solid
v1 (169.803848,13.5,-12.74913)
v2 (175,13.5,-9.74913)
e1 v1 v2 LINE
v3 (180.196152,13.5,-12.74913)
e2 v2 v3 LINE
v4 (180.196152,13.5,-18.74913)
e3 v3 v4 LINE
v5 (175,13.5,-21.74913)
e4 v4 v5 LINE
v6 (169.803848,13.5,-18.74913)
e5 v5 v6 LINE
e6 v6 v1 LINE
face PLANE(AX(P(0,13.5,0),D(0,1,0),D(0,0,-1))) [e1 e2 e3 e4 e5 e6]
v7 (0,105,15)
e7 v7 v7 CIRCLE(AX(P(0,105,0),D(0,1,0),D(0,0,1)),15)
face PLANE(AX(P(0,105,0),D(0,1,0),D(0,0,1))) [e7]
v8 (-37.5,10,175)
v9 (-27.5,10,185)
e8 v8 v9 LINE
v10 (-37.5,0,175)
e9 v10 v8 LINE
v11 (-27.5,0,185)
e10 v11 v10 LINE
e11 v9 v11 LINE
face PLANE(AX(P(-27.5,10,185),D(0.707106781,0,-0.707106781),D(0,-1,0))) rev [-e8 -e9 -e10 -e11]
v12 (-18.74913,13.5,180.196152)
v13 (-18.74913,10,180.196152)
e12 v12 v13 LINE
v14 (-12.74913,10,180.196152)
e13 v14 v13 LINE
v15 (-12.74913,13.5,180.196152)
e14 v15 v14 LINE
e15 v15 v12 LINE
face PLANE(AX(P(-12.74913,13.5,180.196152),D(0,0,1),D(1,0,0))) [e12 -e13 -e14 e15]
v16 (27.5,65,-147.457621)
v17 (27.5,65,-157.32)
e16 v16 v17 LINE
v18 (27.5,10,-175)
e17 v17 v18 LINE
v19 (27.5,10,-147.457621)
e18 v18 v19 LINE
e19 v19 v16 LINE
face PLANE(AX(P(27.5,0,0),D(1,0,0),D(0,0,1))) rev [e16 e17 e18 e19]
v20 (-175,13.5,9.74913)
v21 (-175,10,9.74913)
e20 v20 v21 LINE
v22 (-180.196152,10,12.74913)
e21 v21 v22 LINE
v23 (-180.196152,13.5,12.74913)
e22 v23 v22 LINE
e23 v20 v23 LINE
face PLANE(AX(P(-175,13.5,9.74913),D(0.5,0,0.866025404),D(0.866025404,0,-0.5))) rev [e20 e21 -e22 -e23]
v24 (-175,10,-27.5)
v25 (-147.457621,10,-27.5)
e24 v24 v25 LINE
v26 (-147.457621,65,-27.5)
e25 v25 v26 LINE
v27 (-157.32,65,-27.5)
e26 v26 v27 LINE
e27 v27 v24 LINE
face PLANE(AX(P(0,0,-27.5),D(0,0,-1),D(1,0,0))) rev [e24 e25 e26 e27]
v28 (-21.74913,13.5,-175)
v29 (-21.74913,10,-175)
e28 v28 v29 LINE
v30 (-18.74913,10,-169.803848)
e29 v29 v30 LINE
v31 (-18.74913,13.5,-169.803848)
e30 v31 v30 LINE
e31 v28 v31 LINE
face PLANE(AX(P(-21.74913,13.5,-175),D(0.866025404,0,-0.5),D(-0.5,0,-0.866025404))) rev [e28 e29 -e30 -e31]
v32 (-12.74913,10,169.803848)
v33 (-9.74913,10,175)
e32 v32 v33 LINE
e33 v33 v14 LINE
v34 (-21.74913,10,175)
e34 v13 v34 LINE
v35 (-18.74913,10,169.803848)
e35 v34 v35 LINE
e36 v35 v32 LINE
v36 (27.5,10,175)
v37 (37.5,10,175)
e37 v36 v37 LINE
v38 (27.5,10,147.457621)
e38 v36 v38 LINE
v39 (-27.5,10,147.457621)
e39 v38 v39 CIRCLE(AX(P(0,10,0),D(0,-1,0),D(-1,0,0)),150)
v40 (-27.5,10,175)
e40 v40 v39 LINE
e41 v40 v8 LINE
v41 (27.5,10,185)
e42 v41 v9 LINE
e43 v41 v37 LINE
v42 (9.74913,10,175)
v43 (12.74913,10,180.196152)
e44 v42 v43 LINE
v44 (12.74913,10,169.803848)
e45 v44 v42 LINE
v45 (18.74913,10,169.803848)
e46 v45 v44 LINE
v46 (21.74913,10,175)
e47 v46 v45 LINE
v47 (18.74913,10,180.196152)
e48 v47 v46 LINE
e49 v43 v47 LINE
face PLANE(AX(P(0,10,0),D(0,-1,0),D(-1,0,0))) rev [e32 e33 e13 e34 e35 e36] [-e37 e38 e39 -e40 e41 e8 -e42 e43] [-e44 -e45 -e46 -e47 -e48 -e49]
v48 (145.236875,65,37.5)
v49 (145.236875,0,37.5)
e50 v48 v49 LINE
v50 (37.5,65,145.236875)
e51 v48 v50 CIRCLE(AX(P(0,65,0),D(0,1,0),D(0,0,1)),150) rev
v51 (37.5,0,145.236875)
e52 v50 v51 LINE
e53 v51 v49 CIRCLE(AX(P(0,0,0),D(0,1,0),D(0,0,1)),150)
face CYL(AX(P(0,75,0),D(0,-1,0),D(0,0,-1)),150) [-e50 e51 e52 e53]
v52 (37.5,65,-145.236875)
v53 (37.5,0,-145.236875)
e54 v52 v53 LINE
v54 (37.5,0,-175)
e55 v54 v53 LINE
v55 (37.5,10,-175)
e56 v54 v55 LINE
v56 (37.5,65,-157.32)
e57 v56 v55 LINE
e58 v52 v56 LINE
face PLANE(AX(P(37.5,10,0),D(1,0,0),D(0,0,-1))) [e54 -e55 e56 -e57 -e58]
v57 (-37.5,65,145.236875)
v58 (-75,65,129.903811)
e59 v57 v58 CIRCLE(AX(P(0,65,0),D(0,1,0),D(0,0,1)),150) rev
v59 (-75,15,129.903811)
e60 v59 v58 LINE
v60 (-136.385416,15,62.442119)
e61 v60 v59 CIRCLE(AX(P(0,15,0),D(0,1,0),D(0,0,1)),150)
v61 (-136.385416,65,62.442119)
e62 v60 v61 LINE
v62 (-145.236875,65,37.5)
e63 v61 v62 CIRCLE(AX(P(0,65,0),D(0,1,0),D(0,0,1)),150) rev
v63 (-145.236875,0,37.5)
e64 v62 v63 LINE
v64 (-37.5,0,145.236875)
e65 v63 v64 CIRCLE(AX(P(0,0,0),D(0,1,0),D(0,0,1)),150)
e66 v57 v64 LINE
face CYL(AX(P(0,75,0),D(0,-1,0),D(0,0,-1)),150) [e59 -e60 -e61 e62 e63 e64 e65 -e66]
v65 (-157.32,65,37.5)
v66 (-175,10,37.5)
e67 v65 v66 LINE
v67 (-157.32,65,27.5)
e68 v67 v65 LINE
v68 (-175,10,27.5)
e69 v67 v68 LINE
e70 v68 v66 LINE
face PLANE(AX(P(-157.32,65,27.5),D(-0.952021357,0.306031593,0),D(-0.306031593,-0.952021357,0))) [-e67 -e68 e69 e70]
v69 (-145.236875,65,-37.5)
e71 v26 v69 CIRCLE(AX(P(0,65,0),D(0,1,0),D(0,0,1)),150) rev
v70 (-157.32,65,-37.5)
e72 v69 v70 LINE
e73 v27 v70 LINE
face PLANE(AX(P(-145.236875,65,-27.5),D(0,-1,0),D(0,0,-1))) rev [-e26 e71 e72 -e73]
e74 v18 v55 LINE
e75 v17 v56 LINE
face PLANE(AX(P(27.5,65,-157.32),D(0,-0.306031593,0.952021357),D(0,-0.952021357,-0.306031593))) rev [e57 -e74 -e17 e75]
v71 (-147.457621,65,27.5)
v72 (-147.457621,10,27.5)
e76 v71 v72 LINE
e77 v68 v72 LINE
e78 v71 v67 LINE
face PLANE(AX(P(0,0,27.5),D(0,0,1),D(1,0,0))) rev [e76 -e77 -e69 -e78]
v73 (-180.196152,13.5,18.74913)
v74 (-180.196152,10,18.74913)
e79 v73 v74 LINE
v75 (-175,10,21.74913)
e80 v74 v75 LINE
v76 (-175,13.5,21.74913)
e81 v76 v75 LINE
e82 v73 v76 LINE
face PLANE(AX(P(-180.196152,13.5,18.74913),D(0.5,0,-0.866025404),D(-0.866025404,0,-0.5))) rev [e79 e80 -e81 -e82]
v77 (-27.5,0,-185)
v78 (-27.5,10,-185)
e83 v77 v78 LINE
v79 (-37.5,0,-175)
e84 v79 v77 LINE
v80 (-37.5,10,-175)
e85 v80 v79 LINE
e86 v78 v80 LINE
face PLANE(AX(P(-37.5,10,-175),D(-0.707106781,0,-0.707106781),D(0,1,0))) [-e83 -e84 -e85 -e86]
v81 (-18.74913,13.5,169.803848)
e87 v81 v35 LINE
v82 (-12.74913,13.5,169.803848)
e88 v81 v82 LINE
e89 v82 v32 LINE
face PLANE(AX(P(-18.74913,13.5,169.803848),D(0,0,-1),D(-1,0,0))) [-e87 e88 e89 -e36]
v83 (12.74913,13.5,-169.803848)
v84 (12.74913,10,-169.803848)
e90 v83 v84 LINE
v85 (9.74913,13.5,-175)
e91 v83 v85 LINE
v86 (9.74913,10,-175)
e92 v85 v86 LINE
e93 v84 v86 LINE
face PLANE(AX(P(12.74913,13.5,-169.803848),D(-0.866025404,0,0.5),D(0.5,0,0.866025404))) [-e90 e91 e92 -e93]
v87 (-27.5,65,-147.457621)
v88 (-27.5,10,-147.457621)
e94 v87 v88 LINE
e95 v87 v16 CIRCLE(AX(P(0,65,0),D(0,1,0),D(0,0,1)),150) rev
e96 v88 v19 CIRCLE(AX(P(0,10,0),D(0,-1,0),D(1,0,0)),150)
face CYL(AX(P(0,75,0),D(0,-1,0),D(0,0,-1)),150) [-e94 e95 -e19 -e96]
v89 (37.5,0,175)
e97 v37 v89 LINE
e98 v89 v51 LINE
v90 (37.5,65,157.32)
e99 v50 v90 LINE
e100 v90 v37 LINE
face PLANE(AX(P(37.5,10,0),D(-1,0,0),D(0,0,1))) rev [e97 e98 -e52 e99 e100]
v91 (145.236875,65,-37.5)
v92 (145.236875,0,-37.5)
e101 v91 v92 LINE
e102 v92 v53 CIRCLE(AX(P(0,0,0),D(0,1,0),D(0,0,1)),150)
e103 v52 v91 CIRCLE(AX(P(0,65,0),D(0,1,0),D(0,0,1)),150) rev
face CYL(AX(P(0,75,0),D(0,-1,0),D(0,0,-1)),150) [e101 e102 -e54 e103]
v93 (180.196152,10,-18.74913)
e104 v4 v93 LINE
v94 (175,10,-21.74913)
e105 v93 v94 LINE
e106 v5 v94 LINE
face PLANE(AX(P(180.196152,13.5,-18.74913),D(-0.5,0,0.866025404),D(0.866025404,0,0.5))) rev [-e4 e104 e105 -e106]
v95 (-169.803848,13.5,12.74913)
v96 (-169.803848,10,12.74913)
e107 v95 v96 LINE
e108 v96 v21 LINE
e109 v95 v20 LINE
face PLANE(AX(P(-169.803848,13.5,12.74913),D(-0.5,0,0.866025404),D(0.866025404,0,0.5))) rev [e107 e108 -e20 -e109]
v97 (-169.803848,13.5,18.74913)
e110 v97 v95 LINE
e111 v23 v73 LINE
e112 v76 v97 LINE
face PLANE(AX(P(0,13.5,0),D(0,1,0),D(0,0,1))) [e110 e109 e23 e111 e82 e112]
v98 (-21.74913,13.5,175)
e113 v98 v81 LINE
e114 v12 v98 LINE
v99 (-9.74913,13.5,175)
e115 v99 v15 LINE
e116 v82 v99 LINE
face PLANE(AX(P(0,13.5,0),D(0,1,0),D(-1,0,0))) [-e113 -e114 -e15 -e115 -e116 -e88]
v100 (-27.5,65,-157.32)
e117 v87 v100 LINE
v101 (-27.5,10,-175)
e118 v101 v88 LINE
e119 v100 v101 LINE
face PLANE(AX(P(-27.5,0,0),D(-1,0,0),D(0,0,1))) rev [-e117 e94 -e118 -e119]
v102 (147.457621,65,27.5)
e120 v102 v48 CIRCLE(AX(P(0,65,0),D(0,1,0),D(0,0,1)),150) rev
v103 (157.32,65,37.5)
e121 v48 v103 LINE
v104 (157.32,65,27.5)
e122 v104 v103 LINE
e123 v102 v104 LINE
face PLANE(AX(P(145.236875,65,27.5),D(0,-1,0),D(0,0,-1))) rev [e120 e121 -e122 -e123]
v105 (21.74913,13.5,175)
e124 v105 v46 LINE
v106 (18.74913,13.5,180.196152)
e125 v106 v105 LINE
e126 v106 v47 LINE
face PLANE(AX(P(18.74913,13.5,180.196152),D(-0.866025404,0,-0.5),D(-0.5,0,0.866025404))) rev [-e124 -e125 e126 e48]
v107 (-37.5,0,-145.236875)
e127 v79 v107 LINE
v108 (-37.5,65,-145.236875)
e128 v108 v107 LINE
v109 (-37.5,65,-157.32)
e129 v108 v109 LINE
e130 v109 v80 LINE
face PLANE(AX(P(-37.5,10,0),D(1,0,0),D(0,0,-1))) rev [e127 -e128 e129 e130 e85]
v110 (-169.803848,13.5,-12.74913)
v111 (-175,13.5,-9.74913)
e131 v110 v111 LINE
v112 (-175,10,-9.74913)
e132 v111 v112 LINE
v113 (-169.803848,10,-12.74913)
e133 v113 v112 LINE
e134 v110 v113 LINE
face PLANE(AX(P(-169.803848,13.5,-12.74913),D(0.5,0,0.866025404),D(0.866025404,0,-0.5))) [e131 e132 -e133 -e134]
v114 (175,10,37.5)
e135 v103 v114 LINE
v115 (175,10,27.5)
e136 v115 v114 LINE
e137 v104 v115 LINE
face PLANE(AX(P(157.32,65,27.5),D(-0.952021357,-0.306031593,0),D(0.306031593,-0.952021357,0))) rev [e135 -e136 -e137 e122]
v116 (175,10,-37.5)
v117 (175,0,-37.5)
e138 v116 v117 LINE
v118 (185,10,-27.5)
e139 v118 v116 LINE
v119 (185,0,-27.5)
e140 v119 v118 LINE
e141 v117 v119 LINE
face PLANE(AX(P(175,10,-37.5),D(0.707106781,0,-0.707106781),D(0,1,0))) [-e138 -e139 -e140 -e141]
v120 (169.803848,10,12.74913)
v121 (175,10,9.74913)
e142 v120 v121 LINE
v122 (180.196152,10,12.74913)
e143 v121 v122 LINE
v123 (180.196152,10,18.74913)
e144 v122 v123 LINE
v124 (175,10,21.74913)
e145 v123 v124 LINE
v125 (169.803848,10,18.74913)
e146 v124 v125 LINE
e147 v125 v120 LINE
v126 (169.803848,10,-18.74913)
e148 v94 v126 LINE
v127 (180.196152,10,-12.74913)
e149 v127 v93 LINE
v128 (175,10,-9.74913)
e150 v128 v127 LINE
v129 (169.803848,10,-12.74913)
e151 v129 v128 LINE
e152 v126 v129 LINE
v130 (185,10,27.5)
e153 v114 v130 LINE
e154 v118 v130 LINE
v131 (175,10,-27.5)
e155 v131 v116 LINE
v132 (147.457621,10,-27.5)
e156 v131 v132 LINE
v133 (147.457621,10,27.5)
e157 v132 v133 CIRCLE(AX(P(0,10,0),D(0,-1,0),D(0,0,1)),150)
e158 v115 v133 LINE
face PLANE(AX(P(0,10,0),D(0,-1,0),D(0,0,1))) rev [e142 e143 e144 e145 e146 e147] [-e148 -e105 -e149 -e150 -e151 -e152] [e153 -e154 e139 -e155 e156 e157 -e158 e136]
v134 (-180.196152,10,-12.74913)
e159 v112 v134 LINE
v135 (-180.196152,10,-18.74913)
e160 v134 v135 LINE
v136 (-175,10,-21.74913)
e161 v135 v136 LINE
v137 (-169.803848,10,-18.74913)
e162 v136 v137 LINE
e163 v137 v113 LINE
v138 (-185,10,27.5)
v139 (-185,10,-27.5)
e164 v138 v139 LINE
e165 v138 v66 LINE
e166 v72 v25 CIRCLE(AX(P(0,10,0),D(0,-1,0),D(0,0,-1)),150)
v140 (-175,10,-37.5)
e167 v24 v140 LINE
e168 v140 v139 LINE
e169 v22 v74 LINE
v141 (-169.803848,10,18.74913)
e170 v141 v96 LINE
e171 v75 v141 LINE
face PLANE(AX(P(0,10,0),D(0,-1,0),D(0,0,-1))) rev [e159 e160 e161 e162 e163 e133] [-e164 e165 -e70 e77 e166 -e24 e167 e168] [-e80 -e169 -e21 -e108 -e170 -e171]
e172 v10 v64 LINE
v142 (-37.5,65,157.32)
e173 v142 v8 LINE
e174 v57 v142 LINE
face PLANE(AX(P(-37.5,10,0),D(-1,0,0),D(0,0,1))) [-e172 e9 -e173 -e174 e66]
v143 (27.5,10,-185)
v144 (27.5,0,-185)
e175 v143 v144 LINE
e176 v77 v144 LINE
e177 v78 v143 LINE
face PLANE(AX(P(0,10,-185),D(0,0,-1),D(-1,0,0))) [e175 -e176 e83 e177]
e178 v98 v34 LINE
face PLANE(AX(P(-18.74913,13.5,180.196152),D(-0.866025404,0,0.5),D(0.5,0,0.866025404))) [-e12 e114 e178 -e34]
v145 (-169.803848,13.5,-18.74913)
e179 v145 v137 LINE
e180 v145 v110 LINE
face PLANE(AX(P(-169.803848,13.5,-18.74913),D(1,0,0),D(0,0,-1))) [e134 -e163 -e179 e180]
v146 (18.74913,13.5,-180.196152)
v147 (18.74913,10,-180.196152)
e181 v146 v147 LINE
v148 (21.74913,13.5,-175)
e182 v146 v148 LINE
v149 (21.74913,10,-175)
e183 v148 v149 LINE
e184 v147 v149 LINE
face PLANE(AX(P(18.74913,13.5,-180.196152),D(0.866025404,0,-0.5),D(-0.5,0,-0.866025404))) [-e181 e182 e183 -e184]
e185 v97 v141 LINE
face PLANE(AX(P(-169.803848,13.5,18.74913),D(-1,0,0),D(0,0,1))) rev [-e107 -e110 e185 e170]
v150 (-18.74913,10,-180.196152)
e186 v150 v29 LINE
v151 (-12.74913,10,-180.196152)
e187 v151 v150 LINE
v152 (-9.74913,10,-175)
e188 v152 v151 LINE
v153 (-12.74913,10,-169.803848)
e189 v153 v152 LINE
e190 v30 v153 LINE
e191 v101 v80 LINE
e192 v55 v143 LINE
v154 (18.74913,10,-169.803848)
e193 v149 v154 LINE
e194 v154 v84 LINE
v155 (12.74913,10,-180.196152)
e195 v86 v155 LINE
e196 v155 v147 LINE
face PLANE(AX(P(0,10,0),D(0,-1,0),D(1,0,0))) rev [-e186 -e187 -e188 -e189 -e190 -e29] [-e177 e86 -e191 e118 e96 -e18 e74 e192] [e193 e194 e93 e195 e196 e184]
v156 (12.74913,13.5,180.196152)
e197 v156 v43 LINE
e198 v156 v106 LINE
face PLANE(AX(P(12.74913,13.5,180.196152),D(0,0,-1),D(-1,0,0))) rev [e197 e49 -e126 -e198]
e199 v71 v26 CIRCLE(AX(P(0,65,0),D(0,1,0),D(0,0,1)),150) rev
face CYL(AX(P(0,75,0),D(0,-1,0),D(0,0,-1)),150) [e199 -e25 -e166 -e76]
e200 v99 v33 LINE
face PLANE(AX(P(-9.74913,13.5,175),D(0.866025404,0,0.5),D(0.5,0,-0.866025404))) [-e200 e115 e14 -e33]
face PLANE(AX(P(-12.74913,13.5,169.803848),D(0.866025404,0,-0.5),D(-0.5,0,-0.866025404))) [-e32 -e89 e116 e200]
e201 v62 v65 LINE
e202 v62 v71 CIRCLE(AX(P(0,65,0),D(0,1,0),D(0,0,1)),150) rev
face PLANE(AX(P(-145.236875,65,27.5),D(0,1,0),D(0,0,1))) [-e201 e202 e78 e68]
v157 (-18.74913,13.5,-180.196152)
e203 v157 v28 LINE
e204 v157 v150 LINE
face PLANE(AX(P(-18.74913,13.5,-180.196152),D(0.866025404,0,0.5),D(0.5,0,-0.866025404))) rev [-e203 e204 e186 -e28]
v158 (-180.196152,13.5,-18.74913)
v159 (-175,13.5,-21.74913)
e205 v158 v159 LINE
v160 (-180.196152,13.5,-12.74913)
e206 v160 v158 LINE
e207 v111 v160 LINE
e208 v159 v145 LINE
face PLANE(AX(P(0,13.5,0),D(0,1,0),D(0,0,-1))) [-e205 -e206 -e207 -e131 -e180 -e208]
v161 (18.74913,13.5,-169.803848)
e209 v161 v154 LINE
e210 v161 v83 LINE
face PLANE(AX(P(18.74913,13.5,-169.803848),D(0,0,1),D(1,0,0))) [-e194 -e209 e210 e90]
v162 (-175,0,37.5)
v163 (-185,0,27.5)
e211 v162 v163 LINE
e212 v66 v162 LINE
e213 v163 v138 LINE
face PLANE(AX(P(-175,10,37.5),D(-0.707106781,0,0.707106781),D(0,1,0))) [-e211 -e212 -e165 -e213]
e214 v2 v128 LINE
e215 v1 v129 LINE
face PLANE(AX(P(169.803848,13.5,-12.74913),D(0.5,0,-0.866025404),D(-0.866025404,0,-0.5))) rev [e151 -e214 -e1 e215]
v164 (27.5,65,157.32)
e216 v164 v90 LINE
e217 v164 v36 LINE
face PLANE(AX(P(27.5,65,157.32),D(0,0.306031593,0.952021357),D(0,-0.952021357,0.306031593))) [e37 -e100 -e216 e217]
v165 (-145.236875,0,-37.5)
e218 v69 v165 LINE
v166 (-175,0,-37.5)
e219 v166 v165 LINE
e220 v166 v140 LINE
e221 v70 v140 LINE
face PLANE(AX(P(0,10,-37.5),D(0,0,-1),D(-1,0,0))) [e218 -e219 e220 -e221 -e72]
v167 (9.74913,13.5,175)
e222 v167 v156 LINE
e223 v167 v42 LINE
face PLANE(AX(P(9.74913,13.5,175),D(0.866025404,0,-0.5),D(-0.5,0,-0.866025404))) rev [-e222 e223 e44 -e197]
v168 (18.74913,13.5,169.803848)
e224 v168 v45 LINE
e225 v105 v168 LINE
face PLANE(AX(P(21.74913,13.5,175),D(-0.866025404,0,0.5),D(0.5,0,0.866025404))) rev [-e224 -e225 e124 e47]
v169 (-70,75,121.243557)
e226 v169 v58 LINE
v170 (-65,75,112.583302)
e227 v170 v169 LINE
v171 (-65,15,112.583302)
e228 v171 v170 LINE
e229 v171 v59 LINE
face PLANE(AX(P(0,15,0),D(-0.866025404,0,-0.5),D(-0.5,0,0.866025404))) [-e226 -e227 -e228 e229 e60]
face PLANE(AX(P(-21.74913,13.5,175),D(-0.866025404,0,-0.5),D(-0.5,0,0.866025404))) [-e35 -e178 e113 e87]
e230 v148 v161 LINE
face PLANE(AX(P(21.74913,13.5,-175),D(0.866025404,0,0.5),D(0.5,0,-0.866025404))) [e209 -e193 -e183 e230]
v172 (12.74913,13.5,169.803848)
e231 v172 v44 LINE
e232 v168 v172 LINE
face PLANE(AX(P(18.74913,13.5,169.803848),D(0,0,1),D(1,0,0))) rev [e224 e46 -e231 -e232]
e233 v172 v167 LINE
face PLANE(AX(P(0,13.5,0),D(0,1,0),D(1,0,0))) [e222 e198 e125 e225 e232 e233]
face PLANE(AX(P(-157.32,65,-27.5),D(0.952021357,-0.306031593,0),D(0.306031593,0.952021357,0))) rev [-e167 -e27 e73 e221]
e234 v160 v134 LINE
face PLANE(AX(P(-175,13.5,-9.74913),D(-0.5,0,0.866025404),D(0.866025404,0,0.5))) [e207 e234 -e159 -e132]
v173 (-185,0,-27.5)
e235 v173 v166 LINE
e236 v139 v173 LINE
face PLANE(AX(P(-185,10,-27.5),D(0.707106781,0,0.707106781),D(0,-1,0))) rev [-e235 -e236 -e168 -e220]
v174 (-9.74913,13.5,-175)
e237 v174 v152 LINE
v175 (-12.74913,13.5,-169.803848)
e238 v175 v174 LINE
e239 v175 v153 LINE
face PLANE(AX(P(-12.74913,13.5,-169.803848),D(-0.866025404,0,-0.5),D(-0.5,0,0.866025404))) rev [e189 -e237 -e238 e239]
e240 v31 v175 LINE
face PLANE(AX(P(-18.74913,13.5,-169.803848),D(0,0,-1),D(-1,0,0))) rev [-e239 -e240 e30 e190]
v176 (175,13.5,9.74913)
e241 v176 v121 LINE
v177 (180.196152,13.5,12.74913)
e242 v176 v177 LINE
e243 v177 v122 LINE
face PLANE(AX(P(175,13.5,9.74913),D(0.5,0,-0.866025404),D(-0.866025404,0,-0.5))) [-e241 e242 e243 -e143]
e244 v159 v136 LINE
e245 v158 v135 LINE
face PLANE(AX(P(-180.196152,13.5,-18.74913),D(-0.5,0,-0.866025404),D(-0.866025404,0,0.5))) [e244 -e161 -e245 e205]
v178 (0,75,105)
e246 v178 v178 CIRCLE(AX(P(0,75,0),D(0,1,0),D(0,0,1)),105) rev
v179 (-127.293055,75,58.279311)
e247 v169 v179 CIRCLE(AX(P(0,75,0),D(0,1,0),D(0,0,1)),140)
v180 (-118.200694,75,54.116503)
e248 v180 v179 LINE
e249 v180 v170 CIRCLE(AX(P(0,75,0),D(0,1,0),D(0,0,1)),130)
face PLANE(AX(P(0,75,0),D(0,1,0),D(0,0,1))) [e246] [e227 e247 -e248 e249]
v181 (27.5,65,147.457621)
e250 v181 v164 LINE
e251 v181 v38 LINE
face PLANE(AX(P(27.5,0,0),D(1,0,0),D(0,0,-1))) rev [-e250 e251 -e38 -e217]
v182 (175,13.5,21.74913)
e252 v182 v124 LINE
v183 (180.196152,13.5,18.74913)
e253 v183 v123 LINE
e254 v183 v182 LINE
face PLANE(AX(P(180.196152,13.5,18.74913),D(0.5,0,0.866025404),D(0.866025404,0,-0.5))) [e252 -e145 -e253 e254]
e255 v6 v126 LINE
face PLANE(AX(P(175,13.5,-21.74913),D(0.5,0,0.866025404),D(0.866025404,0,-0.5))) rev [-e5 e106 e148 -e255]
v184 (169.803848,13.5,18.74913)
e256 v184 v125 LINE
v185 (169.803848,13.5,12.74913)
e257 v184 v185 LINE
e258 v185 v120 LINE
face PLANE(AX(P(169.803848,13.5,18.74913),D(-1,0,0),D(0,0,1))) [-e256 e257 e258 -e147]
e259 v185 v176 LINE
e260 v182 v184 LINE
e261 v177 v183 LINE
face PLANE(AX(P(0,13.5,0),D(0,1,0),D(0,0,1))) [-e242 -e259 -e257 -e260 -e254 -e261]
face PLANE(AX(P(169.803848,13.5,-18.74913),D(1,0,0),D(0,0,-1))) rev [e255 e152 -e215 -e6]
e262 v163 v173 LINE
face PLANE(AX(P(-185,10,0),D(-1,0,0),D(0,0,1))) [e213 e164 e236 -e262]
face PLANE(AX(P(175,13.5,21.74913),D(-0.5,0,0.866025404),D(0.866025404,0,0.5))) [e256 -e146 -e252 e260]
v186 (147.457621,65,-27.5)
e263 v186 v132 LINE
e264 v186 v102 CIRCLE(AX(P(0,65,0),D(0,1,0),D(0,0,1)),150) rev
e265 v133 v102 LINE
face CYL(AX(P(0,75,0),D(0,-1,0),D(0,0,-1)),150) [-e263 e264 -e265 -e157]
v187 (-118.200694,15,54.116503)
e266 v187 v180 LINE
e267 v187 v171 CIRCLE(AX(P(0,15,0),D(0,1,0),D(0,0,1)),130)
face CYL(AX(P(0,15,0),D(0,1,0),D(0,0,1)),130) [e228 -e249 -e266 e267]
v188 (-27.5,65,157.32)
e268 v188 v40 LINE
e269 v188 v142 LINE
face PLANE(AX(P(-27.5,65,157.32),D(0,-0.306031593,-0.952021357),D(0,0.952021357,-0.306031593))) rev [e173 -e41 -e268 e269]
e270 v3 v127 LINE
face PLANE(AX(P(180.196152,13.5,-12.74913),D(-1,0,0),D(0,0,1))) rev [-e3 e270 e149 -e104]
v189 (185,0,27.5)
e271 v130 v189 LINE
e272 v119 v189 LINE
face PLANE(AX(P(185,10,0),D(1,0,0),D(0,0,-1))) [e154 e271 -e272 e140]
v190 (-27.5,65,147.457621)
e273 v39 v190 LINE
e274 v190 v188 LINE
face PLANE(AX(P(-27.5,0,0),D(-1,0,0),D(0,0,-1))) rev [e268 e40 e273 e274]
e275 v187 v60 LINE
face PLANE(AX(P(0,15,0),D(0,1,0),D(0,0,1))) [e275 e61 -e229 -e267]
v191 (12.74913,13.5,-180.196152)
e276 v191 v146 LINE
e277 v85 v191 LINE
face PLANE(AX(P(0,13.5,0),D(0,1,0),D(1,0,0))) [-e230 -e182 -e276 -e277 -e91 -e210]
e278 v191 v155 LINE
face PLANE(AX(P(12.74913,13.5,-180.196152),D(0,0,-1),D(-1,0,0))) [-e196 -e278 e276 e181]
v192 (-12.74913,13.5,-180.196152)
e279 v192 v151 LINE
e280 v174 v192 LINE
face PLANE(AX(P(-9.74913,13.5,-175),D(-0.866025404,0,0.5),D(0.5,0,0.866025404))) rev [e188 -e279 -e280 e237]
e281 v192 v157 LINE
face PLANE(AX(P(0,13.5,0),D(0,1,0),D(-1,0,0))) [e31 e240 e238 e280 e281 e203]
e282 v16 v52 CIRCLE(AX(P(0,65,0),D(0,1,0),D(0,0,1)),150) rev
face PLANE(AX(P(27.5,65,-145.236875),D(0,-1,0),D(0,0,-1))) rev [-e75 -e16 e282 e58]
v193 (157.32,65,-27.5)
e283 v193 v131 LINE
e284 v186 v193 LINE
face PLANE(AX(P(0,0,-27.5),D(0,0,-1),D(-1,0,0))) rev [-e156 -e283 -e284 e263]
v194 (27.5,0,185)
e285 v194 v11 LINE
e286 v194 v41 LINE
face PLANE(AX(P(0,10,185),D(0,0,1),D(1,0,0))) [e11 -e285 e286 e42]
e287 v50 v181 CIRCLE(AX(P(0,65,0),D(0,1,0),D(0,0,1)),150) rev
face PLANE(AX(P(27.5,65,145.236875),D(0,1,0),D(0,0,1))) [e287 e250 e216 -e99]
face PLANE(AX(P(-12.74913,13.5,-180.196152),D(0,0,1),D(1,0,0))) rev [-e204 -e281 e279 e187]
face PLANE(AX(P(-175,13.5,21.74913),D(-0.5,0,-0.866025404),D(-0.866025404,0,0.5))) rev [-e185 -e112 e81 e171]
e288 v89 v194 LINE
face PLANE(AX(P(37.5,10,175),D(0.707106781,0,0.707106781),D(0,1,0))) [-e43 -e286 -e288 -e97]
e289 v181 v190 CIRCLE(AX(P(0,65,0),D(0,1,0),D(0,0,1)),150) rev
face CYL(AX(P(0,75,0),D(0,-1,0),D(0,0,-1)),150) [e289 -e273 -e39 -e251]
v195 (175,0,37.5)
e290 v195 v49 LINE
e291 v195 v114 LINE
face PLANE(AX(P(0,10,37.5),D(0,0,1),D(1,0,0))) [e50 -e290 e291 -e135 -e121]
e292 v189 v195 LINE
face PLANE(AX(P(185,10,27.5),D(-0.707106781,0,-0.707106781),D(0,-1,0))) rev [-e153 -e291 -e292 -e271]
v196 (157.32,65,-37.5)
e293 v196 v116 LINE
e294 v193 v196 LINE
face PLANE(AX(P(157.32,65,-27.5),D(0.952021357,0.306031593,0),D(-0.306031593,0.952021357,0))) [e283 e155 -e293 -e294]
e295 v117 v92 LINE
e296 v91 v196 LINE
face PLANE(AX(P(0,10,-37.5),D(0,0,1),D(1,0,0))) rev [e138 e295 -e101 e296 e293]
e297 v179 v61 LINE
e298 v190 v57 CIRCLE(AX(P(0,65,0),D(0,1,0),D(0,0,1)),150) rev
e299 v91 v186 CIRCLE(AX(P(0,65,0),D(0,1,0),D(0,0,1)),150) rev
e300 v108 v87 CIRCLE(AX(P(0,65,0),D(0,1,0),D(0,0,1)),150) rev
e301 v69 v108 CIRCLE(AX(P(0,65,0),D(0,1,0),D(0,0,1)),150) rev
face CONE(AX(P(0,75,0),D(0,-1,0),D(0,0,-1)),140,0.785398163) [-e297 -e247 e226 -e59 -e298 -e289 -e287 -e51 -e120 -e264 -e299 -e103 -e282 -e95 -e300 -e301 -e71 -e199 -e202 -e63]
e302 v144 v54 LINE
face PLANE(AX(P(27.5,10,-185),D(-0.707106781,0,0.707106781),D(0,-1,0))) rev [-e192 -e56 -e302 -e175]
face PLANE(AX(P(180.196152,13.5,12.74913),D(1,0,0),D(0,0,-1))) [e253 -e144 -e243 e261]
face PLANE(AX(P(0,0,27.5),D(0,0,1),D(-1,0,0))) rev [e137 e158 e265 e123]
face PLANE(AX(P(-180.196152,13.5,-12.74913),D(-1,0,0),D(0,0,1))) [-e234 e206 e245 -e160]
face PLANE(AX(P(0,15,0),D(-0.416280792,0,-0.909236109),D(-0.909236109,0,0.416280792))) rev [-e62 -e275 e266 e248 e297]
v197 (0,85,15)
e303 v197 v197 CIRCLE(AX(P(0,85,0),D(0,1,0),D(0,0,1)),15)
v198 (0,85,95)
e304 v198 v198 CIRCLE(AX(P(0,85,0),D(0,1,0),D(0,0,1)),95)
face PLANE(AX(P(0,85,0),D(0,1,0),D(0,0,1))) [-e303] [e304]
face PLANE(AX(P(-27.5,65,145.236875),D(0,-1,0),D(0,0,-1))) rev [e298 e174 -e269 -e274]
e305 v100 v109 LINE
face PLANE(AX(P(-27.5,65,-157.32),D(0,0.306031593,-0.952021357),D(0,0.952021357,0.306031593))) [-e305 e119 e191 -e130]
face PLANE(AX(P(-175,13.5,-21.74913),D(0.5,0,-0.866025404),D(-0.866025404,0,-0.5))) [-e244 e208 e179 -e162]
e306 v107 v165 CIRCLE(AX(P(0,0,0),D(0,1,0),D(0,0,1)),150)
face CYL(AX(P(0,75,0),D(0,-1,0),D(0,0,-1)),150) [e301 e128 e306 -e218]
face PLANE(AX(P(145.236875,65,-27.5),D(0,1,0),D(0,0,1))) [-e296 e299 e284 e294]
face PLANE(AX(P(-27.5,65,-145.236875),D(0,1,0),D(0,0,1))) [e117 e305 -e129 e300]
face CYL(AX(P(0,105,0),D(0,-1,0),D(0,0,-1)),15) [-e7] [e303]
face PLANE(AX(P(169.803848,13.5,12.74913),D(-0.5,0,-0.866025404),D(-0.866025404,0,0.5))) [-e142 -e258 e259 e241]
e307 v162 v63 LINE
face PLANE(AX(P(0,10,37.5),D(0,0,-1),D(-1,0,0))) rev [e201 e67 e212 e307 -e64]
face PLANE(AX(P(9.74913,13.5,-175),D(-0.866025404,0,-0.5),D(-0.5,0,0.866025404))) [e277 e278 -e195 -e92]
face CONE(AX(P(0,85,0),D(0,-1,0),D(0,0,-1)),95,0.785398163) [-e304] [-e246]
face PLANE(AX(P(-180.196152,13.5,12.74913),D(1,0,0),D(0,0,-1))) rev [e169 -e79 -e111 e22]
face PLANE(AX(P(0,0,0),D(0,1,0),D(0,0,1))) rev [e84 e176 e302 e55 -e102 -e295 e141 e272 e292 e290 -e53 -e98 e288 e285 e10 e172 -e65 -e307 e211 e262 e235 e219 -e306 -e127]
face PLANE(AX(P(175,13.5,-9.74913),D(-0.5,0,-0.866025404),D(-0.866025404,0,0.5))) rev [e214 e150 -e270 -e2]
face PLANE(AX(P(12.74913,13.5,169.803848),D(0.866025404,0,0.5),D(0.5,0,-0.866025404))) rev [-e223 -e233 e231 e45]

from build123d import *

# Parameters (mm, degrees)
SKETCH1_R                    = 150
BOSS_EXTRUDE1_DEPTH          = 75
CHAMFER1_SIZE                = 10
BOSS_EXTRUDE2_DEPTH          = 10
CHAMFER2_SIZE                = 10
BOSS_EXTRUDE3_DEPTH          = 10
BOSS_EXTRUDE4_DEPTH          = 3.5
CIRPATTERN1_COUNT            = 4
CIRPATTERN1_COPY_1_DEPTH     = 10
CIRPATTERN1_COPY_2_DEPTH     = 10
CIRPATTERN1_COPY_3_DEPTH     = 10
CIRPATTERN1_COPY_4_DEPTH     = 3.5
CIRPATTERN1_COPY_5_DEPTH     = 3.5
CIRPATTERN1_COPY_6_DEPTH     = 3.5
CHAMFER2_OF_CIRPATTERN1_SIZE = 10
CUT_EXTRUDE2_START           = -60
CUT_EXTRUDE2_DEPTH           = 60
SKETCH6_R                    = 110
BOSS_EXTRUDE5_DEPTH          = 10
CHAMFER3_SIZE                = 15
SKETCH7_R                    = 15
BOSS_EXTRUDE6_DEPTH          = 20


with BuildPart() as part:
    # Sketch1 → Boss-Extrude1 (new body)
    with BuildSketch(Plane(origin=(0, 0, 0), x_dir=(1, 0, 0), z_dir=(0, 1, 0))):
        with Locations(Location((0, 0, 0), (0, 0, 270))):
            Circle(SKETCH1_R)
    extrude(amount=BOSS_EXTRUDE1_DEPTH)

    # Chamfer1
    chamfer1_edges = [part.edges().sort_by_distance(p)[0] for p in [
        (0, 75, -150),
    ]]
    chamfer(chamfer1_edges, length=CHAMFER1_SIZE)

    # Sketch2 → Boss-Extrude2 (add)
    with BuildSketch(Plane.XZ):
        with BuildLine():
            Line((-145.236875483, 37.5), (-185, 37.5))
            Line((-185, 37.5), (-185, -37.5))
            Line((-185, -37.5), (-145.236875483, -37.5))
            ThreePointArc((-145.236875483, -37.5), (-150, 0), (-145.236875483, 37.5))
        make_face()
    boss_extrude2 = extrude(amount=-BOSS_EXTRUDE2_DEPTH)

    # Chamfer2
    chamfer2_edges = [part.edges().sort_by_distance(p)[0] for p in [
        (-185, 5, -37.5),
        (-185, 5, 37.5),
    ]]
    chamfer(chamfer2_edges, length=CHAMFER2_SIZE)

    # Sketch3 → Boss-Extrude3 (add)
    with BuildSketch(Plane.XY.offset(37.5)):
        Polygon((-145.236875483, 10), (-145.236875483, 65), (-157.32, 65), (-175, 10), align=None)
    boss_extrude3 = extrude(amount=-BOSS_EXTRUDE3_DEPTH)

    # Sketch4 → Boss-Extrude4 (add)
    with BuildSketch(Plane(origin=(0, 10, 0), x_dir=(1, 0, 0), z_dir=(0, 1, 0))):
        Polygon((-175, -21.74912957), (-169.803847577, -18.74912957), (-169.803847577, -12.74912957), (-175, -9.74912957), (-180.196152423, -12.74912957), (-180.196152423, -18.74912957), align=None)
    boss_extrude4 = extrude(amount=BOSS_EXTRUDE4_DEPTH)

    # Mirror1: Boss-Extrude3, Boss-Extrude4 across plane
    add(boss_extrude3.mirror(Plane.XY))
    add(boss_extrude4.mirror(Plane.XY))

    # CirPattern1: Boss-Extrude2, Boss-Extrude3, Boss-Extrude4 ×4 about axis
    cirpattern1_axis = Axis((0, 0, 0), (0, 1, 0))
    add([boss_extrude2.rotate(cirpattern1_axis, i * 360 / CIRPATTERN1_COUNT) for i in range(1, CIRPATTERN1_COUNT)])
    add([boss_extrude3.rotate(cirpattern1_axis, i * 360 / CIRPATTERN1_COUNT) for i in range(1, CIRPATTERN1_COUNT)])
    add([boss_extrude4.rotate(cirpattern1_axis, i * 360 / CIRPATTERN1_COUNT) for i in range(1, CIRPATTERN1_COUNT)])

    # CirPattern1 copy 1 sketch → CirPattern1 copy 1 (add)
    with BuildSketch(Plane(origin=(-37.5, 0, 0), x_dir=(0, 0, -1), z_dir=(-1, 0, 0))):
        Polygon((-145.236875483, -10), (-145.236875483, -65), (-157.32, -65), (-175, -10), align=None)
    extrude(amount=-CIRPATTERN1_COPY_1_DEPTH)

    # CirPattern1 copy 2 sketch → CirPattern1 copy 2 (add)
    with BuildSketch(Plane(origin=(0, 0, 37.5), x_dir=(-1, 0, 0), z_dir=(0, 0, 1))):
        Polygon((-145.236875483, -10), (-145.236875483, -65), (-157.32, -65), (-175, -10), align=None)
    extrude(amount=-CIRPATTERN1_COPY_2_DEPTH)

    # CirPattern1 copy 3 sketch → CirPattern1 copy 3 (add)
    with BuildSketch(Plane(origin=(37.5, 0, 0), x_dir=(0, 0, 1), z_dir=(1, 0, 0))):
        Polygon((-145.236875483, -10), (-145.236875483, -65), (-157.32, -65), (-175, -10), align=None)
    extrude(amount=-CIRPATTERN1_COPY_3_DEPTH)

    # CirPattern1 copy 4 sketch → CirPattern1 copy 4 (add)
    with BuildSketch(Plane(origin=(0, 10, 0), x_dir=(0, 0, -1), z_dir=(0, 1, 0))):
        Polygon((-175, 21.74912957), (-169.803847577, 18.74912957), (-169.803847577, 12.74912957), (-175, 9.74912957), (-180.196152423, 12.74912957), (-180.196152423, 18.74912957), align=None)
    extrude(amount=CIRPATTERN1_COPY_4_DEPTH)

    # CirPattern1 copy 5 sketch → CirPattern1 copy 5 (add)
    with BuildSketch(Plane(origin=(0, 10, 0), x_dir=(-1, 0, 0), z_dir=(0, 1, 0))):
        Polygon((-175, 21.74912957), (-169.803847577, 18.74912957), (-169.803847577, 12.74912957), (-175, 9.74912957), (-180.196152423, 12.74912957), (-180.196152423, 18.74912957), align=None)
    extrude(amount=CIRPATTERN1_COPY_5_DEPTH)

    # CirPattern1 copy 6 sketch → CirPattern1 copy 6 (add)
    with BuildSketch(Plane.ZX.offset(10)):
        Polygon((-175, 21.74912957), (-169.803847577, 18.74912957), (-169.803847577, 12.74912957), (-175, 9.74912957), (-180.196152423, 12.74912957), (-180.196152423, 18.74912957), align=None)
    extrude(amount=CIRPATTERN1_COPY_6_DEPTH)

    # Chamfer2 of CirPattern1
    chamfer2_of_cirpattern1_edges = [part.edges().sort_by_distance(p)[0] for p in [
        (-37.5, 5, 185),
        (37.5, 5, 185),
        (185, 5, 37.5),
        (185, 5, -37.5),
        (37.5, 5, -185),
        (-37.5, 5, -185),
    ]]
    chamfer(chamfer2_of_cirpattern1_edges, length=CHAMFER2_OF_CIRPATTERN1_SIZE)

    # Sketch5 → Cut-Extrude2 (cut)
    with BuildSketch(Plane(origin=(0, 75, 0), x_dir=(1, 0, 0), z_dir=(0, 1, 0)).offset(CUT_EXTRUDE2_START)):
        with BuildLine():
            ThreePointArc((-70, -121.24355653), (-103.548353297, -94.221751891), (-127.293055267, -58.279310916))
            Line((-127.293055267, -58.279310916), (-136.385416357, -62.442118839))
            ThreePointArc((-136.385416357, -62.442118839), (-110.944664247, -100.951877026), (-75, -129.903810568))
            Line((-75, -129.903810568), (-70, -121.24355653))
        make_face()
        with BuildLine():
            ThreePointArc((-65, -112.583302492), (-96.152042347, -87.491626756), (-118.200694176, -54.116502994))
            Line((-118.200694176, -54.116502994), (-127.293055267, -58.279310916))
            ThreePointArc((-127.293055267, -58.279310916), (-103.548353297, -94.221751891), (-70, -121.24355653))
            Line((-70, -121.24355653), (-65, -112.583302492))
        make_face()
    extrude(amount=CUT_EXTRUDE2_DEPTH, mode=Mode.SUBTRACT)

    # Sketch6 → Boss-Extrude5 (add)
    with BuildSketch(Plane(origin=(0, 75, 0), x_dir=(1, 0, 0), z_dir=(0, 1, 0))):
        with Locations(Location((0, 0, 0), (0, 0, 270))):
            Circle(SKETCH6_R)
    extrude(amount=BOSS_EXTRUDE5_DEPTH)

    # Chamfer3
    # the kernel refuses this chamfer: 15 mm, written as the material it takes off along each edge
    with BuildSketch(Plane(origin=(0, 85, 0), x_dir=(0, 0, 1), z_dir=(-1, 0, 0))) as chamfer3_piece_1_section:
        Polygon((110, -CHAMFER3_SIZE), (110 - CHAMFER3_SIZE, 0), (110, 0), align=None)
    chamfer3_piece_1 = revolve(axis=Axis((0, 85, 0), (0, 1, 0)), mode=Mode.PRIVATE)
    chamfer3_piece_1 = split(chamfer3_piece_1, bisect_by=Plane(origin=(0, 75, -100.081022807), z_dir=(0, 1, 0)), keep=Keep.TOP, mode=Mode.PRIVATE)
    add(chamfer3_piece_1, mode=Mode.SUBTRACT)

    # Sketch7 → Boss-Extrude6 (add)
    with BuildSketch(Plane(origin=(0, 85, 0), x_dir=(1, 0, 0), z_dir=(0, 1, 0))):
        with Locations(Location((0, 0, 0), (0, 0, 270))):
            Circle(SKETCH7_R)
    extrude(amount=BOSS_EXTRUDE6_DEPTH)


solid = part.part
